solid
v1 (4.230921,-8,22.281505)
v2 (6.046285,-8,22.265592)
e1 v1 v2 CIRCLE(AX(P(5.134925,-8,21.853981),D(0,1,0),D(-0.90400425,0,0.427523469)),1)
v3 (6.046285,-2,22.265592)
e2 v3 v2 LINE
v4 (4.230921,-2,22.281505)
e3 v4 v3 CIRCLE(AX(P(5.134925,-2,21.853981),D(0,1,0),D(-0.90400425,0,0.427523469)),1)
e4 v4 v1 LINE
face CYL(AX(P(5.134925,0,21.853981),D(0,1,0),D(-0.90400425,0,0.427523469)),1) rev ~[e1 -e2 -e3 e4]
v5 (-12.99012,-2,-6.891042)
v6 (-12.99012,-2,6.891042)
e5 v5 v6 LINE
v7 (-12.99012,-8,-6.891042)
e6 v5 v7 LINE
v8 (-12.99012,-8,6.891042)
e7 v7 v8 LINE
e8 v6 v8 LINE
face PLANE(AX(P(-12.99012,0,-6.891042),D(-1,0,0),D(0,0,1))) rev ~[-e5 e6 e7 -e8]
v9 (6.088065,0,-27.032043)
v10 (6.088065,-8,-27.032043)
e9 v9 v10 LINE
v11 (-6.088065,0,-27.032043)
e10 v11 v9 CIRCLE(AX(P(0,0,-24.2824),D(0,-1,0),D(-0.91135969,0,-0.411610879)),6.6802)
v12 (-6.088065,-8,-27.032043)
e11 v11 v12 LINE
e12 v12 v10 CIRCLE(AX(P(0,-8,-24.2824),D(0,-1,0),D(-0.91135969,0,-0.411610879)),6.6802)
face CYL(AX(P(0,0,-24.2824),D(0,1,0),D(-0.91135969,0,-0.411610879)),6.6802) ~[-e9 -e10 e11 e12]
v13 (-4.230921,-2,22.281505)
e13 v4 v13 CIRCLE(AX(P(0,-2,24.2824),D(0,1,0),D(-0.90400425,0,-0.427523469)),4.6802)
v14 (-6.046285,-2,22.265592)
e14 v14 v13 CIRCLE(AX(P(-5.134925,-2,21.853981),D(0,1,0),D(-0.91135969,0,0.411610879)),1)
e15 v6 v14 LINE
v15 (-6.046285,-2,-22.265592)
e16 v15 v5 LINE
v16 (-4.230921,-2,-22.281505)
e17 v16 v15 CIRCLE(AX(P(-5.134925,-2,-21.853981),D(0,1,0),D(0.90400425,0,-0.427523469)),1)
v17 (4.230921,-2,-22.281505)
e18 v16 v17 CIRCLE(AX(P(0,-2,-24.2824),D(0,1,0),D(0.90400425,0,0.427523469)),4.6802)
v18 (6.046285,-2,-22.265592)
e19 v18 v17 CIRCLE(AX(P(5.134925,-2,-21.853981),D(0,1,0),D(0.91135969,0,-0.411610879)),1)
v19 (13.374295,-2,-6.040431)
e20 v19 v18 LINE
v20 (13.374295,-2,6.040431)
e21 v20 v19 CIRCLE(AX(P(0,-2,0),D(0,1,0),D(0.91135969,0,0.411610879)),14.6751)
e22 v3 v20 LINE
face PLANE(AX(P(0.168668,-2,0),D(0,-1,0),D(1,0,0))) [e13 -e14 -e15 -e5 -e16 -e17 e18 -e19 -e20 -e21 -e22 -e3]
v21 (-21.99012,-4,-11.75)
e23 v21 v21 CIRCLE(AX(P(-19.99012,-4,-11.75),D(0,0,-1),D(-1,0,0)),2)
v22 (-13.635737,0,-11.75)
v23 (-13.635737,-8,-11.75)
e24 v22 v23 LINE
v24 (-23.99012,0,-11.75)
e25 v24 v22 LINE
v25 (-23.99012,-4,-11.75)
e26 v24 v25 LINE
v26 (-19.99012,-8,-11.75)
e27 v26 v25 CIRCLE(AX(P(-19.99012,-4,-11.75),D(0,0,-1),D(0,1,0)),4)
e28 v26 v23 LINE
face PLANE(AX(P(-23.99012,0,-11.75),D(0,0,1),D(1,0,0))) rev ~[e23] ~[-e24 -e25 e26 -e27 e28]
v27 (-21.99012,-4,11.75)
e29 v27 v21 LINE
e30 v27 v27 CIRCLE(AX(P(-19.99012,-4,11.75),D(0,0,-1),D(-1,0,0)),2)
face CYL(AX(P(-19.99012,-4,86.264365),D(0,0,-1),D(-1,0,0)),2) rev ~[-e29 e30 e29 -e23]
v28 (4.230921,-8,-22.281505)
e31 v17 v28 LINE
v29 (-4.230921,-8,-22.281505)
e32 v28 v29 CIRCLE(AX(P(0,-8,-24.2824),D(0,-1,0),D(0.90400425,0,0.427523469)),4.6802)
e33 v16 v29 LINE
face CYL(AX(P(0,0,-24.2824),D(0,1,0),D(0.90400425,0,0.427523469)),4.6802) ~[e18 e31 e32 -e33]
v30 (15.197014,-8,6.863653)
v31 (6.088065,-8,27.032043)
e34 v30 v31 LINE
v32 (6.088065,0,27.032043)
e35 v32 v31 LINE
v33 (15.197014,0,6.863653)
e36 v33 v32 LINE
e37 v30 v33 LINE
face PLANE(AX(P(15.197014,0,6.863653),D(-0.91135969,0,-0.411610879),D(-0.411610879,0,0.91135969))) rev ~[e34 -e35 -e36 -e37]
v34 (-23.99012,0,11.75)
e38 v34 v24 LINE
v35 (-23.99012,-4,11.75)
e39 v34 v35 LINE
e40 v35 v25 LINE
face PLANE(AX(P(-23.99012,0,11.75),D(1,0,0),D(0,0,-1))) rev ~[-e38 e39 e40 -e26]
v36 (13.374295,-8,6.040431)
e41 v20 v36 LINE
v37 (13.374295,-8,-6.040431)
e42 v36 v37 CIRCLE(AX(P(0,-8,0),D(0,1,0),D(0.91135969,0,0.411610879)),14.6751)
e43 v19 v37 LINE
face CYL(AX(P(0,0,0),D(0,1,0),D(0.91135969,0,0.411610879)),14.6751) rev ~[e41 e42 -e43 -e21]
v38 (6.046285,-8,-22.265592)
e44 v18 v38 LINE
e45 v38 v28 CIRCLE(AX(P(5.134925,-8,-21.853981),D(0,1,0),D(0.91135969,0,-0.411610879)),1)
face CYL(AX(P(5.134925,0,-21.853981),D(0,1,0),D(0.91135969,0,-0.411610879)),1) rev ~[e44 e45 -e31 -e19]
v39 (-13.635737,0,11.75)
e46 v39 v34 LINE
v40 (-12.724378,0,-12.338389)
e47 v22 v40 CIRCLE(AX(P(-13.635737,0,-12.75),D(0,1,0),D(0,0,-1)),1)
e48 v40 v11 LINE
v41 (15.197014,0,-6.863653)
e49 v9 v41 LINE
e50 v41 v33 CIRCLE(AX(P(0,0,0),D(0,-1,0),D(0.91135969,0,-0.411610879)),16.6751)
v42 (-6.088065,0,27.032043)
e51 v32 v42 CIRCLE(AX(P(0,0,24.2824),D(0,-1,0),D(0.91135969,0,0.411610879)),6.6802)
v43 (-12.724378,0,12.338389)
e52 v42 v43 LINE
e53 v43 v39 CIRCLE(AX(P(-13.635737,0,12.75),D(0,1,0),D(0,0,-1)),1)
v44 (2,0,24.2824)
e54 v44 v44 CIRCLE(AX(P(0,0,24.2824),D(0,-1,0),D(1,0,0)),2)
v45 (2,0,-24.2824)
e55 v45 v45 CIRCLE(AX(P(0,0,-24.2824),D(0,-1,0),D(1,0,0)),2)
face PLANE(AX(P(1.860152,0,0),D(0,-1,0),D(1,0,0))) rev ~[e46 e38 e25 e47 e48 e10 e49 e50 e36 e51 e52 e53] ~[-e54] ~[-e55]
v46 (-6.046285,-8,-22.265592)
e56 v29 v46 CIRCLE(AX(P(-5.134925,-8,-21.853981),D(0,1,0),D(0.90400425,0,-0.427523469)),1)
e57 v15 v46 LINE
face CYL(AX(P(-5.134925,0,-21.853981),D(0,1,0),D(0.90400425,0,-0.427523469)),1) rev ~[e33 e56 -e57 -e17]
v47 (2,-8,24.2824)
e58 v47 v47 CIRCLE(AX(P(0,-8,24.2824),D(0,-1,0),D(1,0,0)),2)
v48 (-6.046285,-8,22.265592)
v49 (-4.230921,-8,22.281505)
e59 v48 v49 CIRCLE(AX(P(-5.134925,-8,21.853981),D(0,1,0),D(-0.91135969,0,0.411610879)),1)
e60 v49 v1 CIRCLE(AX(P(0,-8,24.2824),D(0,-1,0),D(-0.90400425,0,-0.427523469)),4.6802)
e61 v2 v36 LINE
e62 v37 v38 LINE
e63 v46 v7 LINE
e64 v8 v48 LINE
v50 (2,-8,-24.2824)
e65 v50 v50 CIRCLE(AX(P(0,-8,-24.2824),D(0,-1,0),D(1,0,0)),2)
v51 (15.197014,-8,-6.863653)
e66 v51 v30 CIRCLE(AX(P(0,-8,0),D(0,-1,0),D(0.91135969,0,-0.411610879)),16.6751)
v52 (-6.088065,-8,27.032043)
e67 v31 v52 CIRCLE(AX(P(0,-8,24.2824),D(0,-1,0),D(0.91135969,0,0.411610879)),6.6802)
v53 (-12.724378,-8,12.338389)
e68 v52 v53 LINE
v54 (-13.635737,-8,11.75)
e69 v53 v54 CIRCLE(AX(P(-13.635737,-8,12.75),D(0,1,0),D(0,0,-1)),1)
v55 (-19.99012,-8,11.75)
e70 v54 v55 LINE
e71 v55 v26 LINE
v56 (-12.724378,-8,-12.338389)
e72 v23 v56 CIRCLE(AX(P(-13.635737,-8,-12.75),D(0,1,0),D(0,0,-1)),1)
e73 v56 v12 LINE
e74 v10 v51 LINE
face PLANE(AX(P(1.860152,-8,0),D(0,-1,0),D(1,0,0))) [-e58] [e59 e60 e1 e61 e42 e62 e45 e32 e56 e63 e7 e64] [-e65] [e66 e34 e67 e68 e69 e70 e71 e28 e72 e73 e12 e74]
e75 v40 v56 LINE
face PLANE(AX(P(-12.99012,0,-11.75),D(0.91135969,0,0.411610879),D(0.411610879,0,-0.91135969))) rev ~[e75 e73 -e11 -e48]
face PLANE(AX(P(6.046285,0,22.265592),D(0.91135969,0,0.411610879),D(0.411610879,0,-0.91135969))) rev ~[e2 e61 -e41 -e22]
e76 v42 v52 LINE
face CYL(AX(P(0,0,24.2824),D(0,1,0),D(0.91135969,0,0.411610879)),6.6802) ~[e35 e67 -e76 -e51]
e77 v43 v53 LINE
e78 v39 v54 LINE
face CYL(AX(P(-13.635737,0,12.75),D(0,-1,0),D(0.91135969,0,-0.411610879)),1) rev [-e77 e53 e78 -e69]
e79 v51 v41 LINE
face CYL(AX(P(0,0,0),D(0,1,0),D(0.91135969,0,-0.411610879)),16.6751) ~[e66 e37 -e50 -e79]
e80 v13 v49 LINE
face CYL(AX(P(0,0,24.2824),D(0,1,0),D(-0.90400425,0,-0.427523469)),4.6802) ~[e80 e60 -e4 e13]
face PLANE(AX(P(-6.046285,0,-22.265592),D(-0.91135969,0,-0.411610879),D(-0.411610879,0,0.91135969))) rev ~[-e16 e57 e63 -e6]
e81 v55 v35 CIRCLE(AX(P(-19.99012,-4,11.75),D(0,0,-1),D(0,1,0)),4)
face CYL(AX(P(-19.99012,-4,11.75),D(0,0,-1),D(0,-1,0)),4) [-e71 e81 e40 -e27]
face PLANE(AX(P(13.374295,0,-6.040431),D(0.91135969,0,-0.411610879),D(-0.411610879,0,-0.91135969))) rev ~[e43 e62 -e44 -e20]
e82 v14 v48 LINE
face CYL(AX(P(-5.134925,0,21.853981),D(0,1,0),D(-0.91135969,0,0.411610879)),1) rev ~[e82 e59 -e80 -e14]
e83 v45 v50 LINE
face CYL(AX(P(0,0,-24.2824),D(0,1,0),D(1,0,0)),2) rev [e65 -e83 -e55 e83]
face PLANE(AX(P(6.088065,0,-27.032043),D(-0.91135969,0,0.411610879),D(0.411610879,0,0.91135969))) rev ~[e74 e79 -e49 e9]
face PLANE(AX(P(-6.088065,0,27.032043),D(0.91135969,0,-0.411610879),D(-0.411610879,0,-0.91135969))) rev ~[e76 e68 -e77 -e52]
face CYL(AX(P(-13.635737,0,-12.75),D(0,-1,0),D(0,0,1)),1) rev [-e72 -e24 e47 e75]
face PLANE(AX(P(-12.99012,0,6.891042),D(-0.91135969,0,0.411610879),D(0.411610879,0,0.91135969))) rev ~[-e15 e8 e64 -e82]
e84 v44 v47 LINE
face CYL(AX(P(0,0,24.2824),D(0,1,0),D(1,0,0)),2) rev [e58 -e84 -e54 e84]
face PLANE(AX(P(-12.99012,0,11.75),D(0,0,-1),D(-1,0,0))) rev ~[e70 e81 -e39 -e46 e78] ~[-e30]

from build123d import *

# Parameters (mm, degrees)
F0_R     = 2
F1_DEPTH = 8
F2_DEPTH = 2
F3_R     = 1
F5_D     = 4
F6_R     = 4


# Not quite as in the source:
# - a feature names something its author has since deleted; it is built from what else it names


with BuildPart() as f1:
    # F0 (on Front) → F1 (new body)
    with BuildSketch(Plane.XZ):
        with BuildLine():
            Line((15.1970139668, 6.8636525628), (6.0880650012, 27.0320429916))
            ThreePointArc((6.0880650012, 27.0320429916), (0, 30.9626), (-6.0880650012, 27.0320429916))
            Line((-6.0880650012, 27.0320429916), (-12.9901204821, 11.75))
            Line((-12.9901204821, 11.75), (-12.9901204821, 6.8910419314))
            Line((-12.9901204821, 6.8910419314), (-6.0462846285, 22.2655920687))
            ThreePointArc((-6.0462846285, 22.2655920687), (-5.1436901116, 22.8539427752), (-4.2309206889, 22.2815046593))
            ThreePointArc((-4.2309206889, 22.2815046593), (0, 19.6022), (4.2309206889, 22.2815046593))
            ThreePointArc((4.2309206889, 22.2815046593), (5.1436901116, 22.8539427752), (6.0462846285, 22.2655920687))
            Line((6.0462846285, 22.2655920687), (13.3742945868, 6.0404308054))
            ThreePointArc((13.3742945868, 6.0404308054), (14.6751, 0), (13.3742945868, -6.0404308054))
            Line((13.3742945868, -6.0404308054), (6.0462846285, -22.2655920687))
            ThreePointArc((6.0462846285, -22.2655920687), (5.1436901116, -22.8539427752), (4.2309206889, -22.2815046593))
            ThreePointArc((4.2309206889, -22.2815046593), (0, -19.6022), (-4.2309206889, -22.2815046593))
            ThreePointArc((-4.2309206889, -22.2815046593), (-5.1436901116, -22.8539427752), (-6.0462846285, -22.2655920687))
            Line((-6.0462846285, -22.2655920687), (-12.9901204821, -6.8910419314))
            Line((-12.9901204821, -6.8910419314), (-12.9901204821, -11.75))
            Line((-12.9901204821, -11.75), (-6.0880650012, -27.0320429916))
            ThreePointArc((-6.0880650012, -27.0320429916), (0, -30.9626), (6.0880650012, -27.0320429916))
            Line((6.0880650012, -27.0320429916), (15.1970139668, -6.8636525628))
            ThreePointArc((15.1970139668, -6.8636525628), (16.6751, 0), (15.1970139668, 6.8636525628))
        make_face()
        with Locations((0, -24.2824)):
            Circle(F0_R, mode=Mode.SUBTRACT)
        with Locations((0, 24.2824)):
            Circle(F0_R, mode=Mode.SUBTRACT)
        Polygon((-12.9901204821, 6.8910419314), (-12.9901204821, 11.75), (-23.9901204821, 11.75), (-23.9901204821, -11.75), (-12.9901204821, -11.75), (-12.9901204821, -6.8910419314), align=None)
    extrude(amount=F1_DEPTH)

    # F0 (on Front) → F2 (join)
    with BuildSketch(Plane.XZ):
        with BuildLine():
            Line((-6.0462846285, 22.2655920687), (-12.9901204821, 6.8910419314))
            Line((-12.9901204821, 6.8910419314), (-12.9901204821, -6.8910419314))
            Line((-12.9901204821, -6.8910419314), (-6.0462846285, -22.2655920687))
            ThreePointArc((-6.0462846285, -22.2655920687), (-5.1436901116, -22.8539427752), (-4.2309206889, -22.2815046593))
            ThreePointArc((-4.2309206889, -22.2815046593), (0, -19.6022), (4.2309206889, -22.2815046593))
            ThreePointArc((4.2309206889, -22.2815046593), (5.1436901116, -22.8539427752), (6.0462846285, -22.2655920687))
            Line((6.0462846285, -22.2655920687), (13.3742945868, -6.0404308054))
            ThreePointArc((13.3742945868, -6.0404308054), (14.6751, 0), (13.3742945868, 6.0404308054))
            Line((13.3742945868, 6.0404308054), (6.0462846285, 22.2655920687))
            ThreePointArc((6.0462846285, 22.2655920687), (5.1436901116, 22.8539427752), (4.2309206889, 22.2815046593))
            ThreePointArc((4.2309206889, 22.2815046593), (0, 19.6022), (-4.2309206889, 22.2815046593))
            ThreePointArc((-4.2309206889, 22.2815046593), (-5.1436901116, 22.8539427752), (-6.0462846285, 22.2655920687))
        make_face()
        Polygon((-12.9901204821, 6.8910419314), (-12.9901204821, 11.75), (-23.9901204821, 11.75), (-23.9901204821, -11.75), (-12.9901204821, -11.75), (-12.9901204821, -6.8910419314), align=None)
        with BuildLine():
            Line((15.1970139668, 6.8636525628), (6.0880650012, 27.0320429916))
            ThreePointArc((6.0880650012, 27.0320429916), (0, 30.9626), (-6.0880650012, 27.0320429916))
            Line((-6.0880650012, 27.0320429916), (-12.9901204821, 11.75))
            Line((-12.9901204821, 11.75), (-12.9901204821, 6.8910419314))
            Line((-12.9901204821, 6.8910419314), (-6.0462846285, 22.2655920687))
            ThreePointArc((-6.0462846285, 22.2655920687), (-5.1436901116, 22.8539427752), (-4.2309206889, 22.2815046593))
            ThreePointArc((-4.2309206889, 22.2815046593), (0, 19.6022), (4.2309206889, 22.2815046593))
            ThreePointArc((4.2309206889, 22.2815046593), (5.1436901116, 22.8539427752), (6.0462846285, 22.2655920687))
            Line((6.0462846285, 22.2655920687), (13.3742945868, 6.0404308054))
            ThreePointArc((13.3742945868, 6.0404308054), (14.6751, 0), (13.3742945868, -6.0404308054))
            Line((13.3742945868, -6.0404308054), (6.0462846285, -22.2655920687))
            ThreePointArc((6.0462846285, -22.2655920687), (5.1436901116, -22.8539427752), (4.2309206889, -22.2815046593))
            ThreePointArc((4.2309206889, -22.2815046593), (0, -19.6022), (-4.2309206889, -22.2815046593))
            ThreePointArc((-4.2309206889, -22.2815046593), (-5.1436901116, -22.8539427752), (-6.0462846285, -22.2655920687))
            Line((-6.0462846285, -22.2655920687), (-12.9901204821, -6.8910419314))
            Line((-12.9901204821, -6.8910419314), (-12.9901204821, -11.75))
            Line((-12.9901204821, -11.75), (-6.0880650012, -27.0320429916))
            ThreePointArc((-6.0880650012, -27.0320429916), (0, -30.9626), (6.0880650012, -27.0320429916))
            Line((6.0880650012, -27.0320429916), (15.1970139668, -6.8636525628))
            ThreePointArc((15.1970139668, -6.8636525628), (16.6751, 0), (15.1970139668, 6.8636525628))
        make_face()
        with Locations((0, -24.2824)):
            Circle(F0_R, mode=Mode.SUBTRACT)
        with Locations((0, 24.2824)):
            Circle(F0_R, mode=Mode.SUBTRACT)
    extrude(amount=F2_DEPTH)

    # F3
    f3_edges = [f1.edges().sort_by_distance(p)[0] for p in [
        (-12.99012, -4, -11.75),
        (-12.99012, -4, 11.75),
    ]]
    fillet(f3_edges, radius=F3_R)

    # F5 (through all)
    with Locations(Plane.XY.offset(11.75)):
        with Locations((-19.9901204821, -4)):
            Hole(F5_D / 2)

    # F6
    f6_edges = [f1.edges().sort_by_distance(p)[0] for p in [
        (-23.99012, -8, 0),
    ]]
    fillet(f6_edges, radius=F6_R)


solid = f1.part
